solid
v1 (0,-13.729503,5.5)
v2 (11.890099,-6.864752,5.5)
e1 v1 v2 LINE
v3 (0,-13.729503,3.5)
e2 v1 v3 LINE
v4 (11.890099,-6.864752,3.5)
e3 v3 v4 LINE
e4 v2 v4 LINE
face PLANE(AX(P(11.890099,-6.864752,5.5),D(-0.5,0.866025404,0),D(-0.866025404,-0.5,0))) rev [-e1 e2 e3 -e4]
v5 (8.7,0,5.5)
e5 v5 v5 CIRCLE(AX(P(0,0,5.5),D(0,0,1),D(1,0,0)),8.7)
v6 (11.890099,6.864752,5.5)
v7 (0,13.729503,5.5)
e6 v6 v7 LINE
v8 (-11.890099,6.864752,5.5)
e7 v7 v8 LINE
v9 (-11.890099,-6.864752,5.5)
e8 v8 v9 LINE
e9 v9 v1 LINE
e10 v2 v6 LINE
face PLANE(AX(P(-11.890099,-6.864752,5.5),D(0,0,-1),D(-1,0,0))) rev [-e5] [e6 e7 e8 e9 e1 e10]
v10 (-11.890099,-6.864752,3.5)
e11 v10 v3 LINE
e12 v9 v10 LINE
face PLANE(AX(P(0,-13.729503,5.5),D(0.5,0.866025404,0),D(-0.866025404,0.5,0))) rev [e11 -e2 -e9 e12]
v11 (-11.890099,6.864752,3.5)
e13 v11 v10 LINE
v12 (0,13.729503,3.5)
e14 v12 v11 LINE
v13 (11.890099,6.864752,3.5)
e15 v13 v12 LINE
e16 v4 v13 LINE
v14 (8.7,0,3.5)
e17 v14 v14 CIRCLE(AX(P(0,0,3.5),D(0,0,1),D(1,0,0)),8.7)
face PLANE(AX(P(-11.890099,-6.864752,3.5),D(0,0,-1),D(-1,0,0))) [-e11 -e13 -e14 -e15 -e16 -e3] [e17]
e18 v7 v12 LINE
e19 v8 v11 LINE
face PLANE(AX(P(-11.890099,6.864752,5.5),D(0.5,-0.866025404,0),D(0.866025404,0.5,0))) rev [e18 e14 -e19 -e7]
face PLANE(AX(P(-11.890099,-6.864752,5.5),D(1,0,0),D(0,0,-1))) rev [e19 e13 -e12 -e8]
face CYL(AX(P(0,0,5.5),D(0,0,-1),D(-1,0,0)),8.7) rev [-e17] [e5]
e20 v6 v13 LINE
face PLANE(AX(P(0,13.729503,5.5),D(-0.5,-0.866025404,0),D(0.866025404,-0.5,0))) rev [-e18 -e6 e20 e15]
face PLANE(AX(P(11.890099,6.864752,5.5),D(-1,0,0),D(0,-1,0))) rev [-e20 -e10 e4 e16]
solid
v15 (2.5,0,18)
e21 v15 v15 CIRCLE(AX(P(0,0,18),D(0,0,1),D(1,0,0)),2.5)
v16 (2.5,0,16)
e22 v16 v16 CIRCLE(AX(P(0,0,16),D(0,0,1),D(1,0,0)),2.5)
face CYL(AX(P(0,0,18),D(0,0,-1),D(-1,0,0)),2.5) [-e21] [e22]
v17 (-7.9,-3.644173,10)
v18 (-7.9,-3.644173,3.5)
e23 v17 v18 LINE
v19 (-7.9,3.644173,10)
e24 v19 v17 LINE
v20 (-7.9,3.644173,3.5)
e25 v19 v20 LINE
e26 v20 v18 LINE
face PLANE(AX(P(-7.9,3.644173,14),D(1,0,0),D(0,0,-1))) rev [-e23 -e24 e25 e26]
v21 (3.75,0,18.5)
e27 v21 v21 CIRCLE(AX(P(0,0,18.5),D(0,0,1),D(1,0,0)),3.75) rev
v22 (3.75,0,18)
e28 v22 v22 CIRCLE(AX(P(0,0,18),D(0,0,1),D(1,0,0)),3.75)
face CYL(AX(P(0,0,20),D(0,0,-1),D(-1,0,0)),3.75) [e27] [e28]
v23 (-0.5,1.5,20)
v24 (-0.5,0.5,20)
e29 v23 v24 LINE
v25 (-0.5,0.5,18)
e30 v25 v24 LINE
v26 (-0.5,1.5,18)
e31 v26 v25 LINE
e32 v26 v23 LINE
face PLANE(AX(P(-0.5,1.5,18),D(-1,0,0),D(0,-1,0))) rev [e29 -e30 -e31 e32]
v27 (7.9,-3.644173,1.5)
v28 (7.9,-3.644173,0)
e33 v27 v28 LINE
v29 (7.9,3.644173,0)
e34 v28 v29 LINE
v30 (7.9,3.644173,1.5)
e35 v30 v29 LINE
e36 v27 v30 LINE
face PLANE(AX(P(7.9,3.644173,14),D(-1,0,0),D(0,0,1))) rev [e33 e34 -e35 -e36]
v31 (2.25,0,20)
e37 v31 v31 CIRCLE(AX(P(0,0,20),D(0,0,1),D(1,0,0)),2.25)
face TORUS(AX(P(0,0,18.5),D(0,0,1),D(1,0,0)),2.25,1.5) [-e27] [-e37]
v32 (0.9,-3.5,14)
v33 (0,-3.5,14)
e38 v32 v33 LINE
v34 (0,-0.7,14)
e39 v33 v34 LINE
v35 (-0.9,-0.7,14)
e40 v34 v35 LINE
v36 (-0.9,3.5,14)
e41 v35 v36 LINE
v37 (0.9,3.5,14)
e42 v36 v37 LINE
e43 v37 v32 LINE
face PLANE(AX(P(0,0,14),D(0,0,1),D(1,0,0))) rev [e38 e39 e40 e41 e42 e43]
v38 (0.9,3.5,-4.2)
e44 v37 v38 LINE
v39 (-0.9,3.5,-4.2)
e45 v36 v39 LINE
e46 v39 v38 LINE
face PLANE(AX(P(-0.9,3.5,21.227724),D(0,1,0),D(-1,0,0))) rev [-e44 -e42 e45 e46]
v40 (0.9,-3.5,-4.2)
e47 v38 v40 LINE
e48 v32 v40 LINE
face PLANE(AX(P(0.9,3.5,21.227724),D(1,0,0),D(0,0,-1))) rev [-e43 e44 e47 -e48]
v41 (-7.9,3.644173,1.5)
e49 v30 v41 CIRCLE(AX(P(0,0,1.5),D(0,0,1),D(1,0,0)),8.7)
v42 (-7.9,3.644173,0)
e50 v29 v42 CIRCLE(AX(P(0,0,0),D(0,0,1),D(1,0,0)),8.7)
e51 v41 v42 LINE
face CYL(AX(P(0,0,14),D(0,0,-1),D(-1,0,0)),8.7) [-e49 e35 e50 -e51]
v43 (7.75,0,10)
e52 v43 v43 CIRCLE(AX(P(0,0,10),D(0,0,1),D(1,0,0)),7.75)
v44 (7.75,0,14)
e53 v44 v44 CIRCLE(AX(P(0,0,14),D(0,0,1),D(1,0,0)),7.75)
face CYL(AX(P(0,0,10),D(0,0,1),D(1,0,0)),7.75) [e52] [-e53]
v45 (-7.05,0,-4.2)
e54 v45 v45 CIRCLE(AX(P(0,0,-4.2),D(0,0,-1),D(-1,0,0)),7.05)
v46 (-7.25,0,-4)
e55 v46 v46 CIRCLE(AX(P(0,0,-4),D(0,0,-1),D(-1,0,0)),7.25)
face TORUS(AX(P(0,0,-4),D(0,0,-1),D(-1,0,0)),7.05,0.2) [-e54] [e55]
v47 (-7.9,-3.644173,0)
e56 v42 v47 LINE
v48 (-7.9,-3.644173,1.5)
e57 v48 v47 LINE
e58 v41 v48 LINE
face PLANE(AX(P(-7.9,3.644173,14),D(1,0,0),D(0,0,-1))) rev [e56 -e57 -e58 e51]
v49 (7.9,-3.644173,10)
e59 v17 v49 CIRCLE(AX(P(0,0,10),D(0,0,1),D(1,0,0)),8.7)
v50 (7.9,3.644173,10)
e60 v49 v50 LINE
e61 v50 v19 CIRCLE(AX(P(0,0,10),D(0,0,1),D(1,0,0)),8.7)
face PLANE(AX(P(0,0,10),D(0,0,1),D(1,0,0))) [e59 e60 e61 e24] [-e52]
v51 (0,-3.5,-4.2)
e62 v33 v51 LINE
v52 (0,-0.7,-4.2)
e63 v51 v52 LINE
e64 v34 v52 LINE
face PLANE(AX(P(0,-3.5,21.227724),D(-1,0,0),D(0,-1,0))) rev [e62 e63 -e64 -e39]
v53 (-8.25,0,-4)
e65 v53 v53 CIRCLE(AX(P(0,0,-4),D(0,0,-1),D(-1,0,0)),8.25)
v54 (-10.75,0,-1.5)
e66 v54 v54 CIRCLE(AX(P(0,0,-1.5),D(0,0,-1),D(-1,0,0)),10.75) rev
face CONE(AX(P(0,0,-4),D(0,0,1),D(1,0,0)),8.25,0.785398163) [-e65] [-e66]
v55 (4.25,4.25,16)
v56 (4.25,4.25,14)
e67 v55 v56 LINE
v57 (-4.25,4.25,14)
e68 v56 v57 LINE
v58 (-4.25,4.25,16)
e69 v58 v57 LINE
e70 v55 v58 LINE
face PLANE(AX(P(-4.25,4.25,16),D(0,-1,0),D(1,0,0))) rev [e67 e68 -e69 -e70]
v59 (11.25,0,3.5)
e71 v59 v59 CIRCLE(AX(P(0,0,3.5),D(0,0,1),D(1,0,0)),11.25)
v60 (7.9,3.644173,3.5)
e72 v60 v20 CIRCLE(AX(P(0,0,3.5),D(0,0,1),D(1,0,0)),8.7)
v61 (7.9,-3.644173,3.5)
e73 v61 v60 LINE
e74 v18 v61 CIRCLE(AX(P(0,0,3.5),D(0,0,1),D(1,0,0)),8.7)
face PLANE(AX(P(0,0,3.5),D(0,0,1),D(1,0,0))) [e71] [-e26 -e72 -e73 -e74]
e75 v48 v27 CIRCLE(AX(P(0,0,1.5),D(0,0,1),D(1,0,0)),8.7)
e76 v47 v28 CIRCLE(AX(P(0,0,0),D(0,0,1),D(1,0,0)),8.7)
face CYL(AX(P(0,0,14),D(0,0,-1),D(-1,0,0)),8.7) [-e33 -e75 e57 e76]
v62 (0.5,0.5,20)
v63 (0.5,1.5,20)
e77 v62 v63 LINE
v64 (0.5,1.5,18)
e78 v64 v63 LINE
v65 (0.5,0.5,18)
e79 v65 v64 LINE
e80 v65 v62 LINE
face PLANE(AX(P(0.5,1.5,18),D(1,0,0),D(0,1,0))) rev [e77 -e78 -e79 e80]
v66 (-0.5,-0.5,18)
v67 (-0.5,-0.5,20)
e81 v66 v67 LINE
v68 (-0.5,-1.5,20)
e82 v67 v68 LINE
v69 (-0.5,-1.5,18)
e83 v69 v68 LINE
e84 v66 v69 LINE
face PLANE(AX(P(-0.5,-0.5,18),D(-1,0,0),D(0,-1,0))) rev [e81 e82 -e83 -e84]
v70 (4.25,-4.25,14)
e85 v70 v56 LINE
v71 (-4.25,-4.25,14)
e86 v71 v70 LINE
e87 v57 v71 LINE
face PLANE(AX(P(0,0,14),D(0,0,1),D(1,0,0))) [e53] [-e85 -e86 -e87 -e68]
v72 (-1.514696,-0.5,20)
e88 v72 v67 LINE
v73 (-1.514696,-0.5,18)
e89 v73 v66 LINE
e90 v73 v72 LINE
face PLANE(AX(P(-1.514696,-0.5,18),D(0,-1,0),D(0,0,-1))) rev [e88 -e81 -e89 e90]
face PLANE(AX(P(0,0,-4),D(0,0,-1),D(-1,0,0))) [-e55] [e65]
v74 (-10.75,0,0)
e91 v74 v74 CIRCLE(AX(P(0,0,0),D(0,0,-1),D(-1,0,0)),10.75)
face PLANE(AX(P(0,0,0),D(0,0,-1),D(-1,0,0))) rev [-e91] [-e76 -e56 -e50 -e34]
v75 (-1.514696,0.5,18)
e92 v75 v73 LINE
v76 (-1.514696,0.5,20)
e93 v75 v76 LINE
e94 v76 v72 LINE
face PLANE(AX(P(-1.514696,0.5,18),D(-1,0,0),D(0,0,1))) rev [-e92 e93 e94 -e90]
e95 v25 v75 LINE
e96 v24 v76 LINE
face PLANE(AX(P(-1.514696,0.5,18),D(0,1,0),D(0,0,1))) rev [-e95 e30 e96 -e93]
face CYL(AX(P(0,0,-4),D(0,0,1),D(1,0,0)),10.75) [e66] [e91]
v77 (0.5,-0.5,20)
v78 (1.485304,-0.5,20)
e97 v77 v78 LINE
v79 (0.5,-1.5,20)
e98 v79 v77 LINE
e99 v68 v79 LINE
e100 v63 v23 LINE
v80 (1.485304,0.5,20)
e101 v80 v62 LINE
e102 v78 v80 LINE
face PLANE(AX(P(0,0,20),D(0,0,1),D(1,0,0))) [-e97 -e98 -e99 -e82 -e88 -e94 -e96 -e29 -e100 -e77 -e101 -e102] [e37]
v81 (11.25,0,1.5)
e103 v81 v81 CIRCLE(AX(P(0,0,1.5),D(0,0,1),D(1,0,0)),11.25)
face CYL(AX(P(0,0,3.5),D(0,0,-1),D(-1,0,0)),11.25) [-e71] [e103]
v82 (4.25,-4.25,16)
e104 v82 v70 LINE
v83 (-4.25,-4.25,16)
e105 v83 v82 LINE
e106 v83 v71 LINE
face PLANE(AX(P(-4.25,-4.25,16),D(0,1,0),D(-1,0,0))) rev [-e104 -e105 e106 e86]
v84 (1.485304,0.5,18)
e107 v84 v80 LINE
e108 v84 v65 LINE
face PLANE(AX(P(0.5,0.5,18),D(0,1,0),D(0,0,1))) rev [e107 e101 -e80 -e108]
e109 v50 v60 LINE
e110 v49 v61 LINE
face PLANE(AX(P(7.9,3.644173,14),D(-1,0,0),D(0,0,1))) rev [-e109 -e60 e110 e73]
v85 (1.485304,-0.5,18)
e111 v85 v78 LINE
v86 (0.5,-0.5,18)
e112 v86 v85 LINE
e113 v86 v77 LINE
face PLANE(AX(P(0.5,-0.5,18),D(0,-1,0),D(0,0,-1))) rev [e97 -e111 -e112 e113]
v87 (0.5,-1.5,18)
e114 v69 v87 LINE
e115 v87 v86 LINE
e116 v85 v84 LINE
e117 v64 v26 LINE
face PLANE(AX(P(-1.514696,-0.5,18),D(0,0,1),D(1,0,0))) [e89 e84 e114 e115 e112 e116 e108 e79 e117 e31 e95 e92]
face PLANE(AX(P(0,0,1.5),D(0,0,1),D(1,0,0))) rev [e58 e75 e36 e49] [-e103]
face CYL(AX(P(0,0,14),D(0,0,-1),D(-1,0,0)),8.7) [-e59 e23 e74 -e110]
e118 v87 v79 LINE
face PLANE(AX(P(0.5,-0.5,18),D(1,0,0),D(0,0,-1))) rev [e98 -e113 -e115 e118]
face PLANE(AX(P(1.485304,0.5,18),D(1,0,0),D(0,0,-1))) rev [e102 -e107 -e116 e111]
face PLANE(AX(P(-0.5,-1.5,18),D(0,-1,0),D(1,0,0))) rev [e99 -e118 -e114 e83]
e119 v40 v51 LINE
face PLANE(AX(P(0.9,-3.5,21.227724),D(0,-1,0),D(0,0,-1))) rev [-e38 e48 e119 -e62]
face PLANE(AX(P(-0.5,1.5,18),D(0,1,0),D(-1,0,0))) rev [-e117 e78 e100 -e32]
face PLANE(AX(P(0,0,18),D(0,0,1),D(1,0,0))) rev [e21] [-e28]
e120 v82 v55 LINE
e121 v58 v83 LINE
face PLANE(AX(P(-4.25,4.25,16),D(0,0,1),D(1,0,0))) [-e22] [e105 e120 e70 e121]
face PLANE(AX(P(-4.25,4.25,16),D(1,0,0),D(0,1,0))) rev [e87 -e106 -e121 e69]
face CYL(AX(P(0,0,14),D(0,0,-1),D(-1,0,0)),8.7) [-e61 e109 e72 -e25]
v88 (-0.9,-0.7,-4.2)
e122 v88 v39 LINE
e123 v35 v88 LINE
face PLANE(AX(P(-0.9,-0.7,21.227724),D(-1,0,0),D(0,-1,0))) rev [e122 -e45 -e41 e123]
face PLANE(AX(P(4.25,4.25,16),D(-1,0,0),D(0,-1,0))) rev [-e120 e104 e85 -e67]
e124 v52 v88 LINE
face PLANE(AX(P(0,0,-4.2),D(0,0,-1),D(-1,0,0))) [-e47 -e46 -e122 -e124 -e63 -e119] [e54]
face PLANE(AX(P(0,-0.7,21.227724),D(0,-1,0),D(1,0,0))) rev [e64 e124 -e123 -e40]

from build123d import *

# Parameters (mm, degrees)
EXTRUDE_1_DEPTH     = 14
SKETCH_3_R          = 10.75
EXTRUDE_2_DEPTH     = 4
CHAMFER_1_SIZE      = 2.5
SKETCH_4_R          = 11.25
EXTRUDE_3_DEPTH     = 2
SKETCH_5_W          = 8.5
SKETCH_5_H          = 8.5
EXTRUDE_4_DEPTH     = 2
SKETCH_6_R          = 2.5
EXTRUDE_5_DEPTH     = 2
SKETCH_7_R          = 3.75
EXTRUDE_6_DEPTH     = 2
FILLET_1_R          = 1.5
CUT_EXTRUDE_1_DEPTH = 2
SKETCH_9_R          = 8.7
EXTRUDE_7_DEPTH     = 2
SKETCH_12_R         = 7.25
EXTRUDE_8_DEPTH     = 0.2
FILLET_2_R          = 0.2
CUT_EXTRUDE_2_DEPTH = 18.2
CUT_EXTRUDE_START   = -4
SKETCH_13_R         = 7.75
CUT_EXTRUDE_3_DEPTH = 4


with BuildPart() as part:
    # 草图1 → 拉伸1 (new body)
    with BuildSketch(Plane.XY):
        with BuildLine():
            Line((7.9, 3.644173432), (7.9, -3.644173432))
            ThreePointArc((7.9, -3.644173432), (0, -8.7), (-7.9, -3.644173432))
            Line((-7.9, -3.644173432), (-7.9, 3.644173432))
            ThreePointArc((-7.9, 3.644173432), (0, 8.7), (7.9, 3.644173432))
        make_face()
    extrude(amount=EXTRUDE_1_DEPTH)

    # 草图3 → 拉伸2 (add)
    with BuildSketch(Plane(origin=(0, 0, 0), x_dir=(-1, 0, 0), z_dir=(0, 0, -1))):
        Circle(SKETCH_3_R)
    extrude(amount=EXTRUDE_2_DEPTH)

    # 倒角1
    chamfer_1_edges = [part.edges().sort_by_distance(p)[0] for p in [
        (10.75, 0, -4),
    ]]
    chamfer(chamfer_1_edges, length=CHAMFER_1_SIZE)

    # 草图4 → 拉伸3 (add)
    with BuildSketch(Plane.XY.offset(1.5)):
        Circle(SKETCH_4_R)
        with BuildLine():
            Line((-7.11658576, 3.762539983), (-7.11658576, -3.762539983))
            ThreePointArc((-7.11658576, -3.762539983), (0, -8.05), (7.11658576, -3.762539983))
            Line((7.11658576, -3.762539983), (7.11658576, 3.762539983))
            ThreePointArc((7.11658576, 3.762539983), (0, 8.05), (-7.11658576, 3.762539983))
        make_face(mode=Mode.SUBTRACT)
    extrude(amount=EXTRUDE_3_DEPTH)

    # 草图5 → 拉伸4 (add)
    with BuildSketch(Plane.XY.offset(14)):
        Rectangle(SKETCH_5_W, SKETCH_5_H)
    extrude(amount=EXTRUDE_4_DEPTH)

    # 草图6 → 拉伸5 (add)
    with BuildSketch(Plane.XY.offset(16)):
        Circle(SKETCH_6_R)
    extrude(amount=EXTRUDE_5_DEPTH)

    # 草图7 → 拉伸6 (add)
    with BuildSketch(Plane.XY.offset(18)):
        Circle(SKETCH_7_R)
    extrude(amount=EXTRUDE_6_DEPTH)

    # 圆角1
    fillet_1_edges = [part.edges().sort_by_distance(p)[0] for p in [
        (-3.75, 0, 20),
    ]]
    fillet(fillet_1_edges, radius=FILLET_1_R)

    # 草图8 → 切除-拉伸1 (cut)
    with BuildSketch(Plane.XY.offset(20)):
        Polygon((-1.514696486, 0.5), (-0.5, 0.5), (-0.5, 1.5), (0.5, 1.5), (0.5, 0.5), (1.485303514, 0.5), (1.485303514, -0.5), (0.5, -0.5), (0.5, -1.5), (-0.5, -1.5), (-0.5, -0.5), (-1.514696486, -0.5), align=None)
    extrude(amount=-CUT_EXTRUDE_1_DEPTH, mode=Mode.SUBTRACT)

    # 草图12 → 拉伸8 (add)
    with BuildSketch(Plane(origin=(0, 0, -4), x_dir=(-1, 0, 0), z_dir=(0, 0, -1))):
        Circle(SKETCH_12_R)
    extrude(amount=EXTRUDE_8_DEPTH)

    # 圆角2
    fillet_2_edges = [part.edges().sort_by_distance(p)[0] for p in [
        (7.25, 0, -4.2),
    ]]
    fillet(fillet_2_edges, radius=FILLET_2_R - 0.0001)  # a hair under: the kernel refuses the full size

    # 草图10 → 切除-拉伸2 (cut)
    with BuildSketch(Plane(origin=(0, 0, -4.2), x_dir=(-1, 0, 0), z_dir=(0, 0, -1))):
        Polygon((-0.9, 3.5), (-0.9, -3.5), (0, -3.5), (0, -0.7), (0.9, -0.7), (0.9, 3.5), align=None)
    extrude(amount=-CUT_EXTRUDE_2_DEPTH, mode=Mode.SUBTRACT)

    # 草图13 → 切除-拉伸3 (cut)
    with BuildSketch(Plane.XY.offset(14).offset(CUT_EXTRUDE_START)):
        with BuildLine():
            Line((7.9, -3.644173432), (7.9, 3.644173432))
            ThreePointArc((7.9, 3.644173432), (0, 8.7), (-7.9, 3.644173432))
            Line((-7.9, 3.644173432), (-7.9, -3.644173432))
            ThreePointArc((-7.9, -3.644173432), (0, -8.7), (7.9, -3.644173432))
        make_face()
        Circle(SKETCH_13_R, mode=Mode.SUBTRACT)
    extrude(amount=CUT_EXTRUDE_3_DEPTH, mode=Mode.SUBTRACT)


with BuildPart() as body_2:
    # 草图9 → 拉伸7 (new body)
    with BuildSketch(Plane.XY.offset(3.5)):
        Polygon((11.890098709, -6.86475169), (0, -13.72950338), (-11.890098709, -6.86475169), (-11.890098709, 6.86475169), (0, 13.72950338), (11.890098709, 6.86475169), align=None)
        Circle(SKETCH_9_R, mode=Mode.SUBTRACT)
    extrude(amount=EXTRUDE_7_DEPTH)


solid = Compound([part.part, body_2.part])
